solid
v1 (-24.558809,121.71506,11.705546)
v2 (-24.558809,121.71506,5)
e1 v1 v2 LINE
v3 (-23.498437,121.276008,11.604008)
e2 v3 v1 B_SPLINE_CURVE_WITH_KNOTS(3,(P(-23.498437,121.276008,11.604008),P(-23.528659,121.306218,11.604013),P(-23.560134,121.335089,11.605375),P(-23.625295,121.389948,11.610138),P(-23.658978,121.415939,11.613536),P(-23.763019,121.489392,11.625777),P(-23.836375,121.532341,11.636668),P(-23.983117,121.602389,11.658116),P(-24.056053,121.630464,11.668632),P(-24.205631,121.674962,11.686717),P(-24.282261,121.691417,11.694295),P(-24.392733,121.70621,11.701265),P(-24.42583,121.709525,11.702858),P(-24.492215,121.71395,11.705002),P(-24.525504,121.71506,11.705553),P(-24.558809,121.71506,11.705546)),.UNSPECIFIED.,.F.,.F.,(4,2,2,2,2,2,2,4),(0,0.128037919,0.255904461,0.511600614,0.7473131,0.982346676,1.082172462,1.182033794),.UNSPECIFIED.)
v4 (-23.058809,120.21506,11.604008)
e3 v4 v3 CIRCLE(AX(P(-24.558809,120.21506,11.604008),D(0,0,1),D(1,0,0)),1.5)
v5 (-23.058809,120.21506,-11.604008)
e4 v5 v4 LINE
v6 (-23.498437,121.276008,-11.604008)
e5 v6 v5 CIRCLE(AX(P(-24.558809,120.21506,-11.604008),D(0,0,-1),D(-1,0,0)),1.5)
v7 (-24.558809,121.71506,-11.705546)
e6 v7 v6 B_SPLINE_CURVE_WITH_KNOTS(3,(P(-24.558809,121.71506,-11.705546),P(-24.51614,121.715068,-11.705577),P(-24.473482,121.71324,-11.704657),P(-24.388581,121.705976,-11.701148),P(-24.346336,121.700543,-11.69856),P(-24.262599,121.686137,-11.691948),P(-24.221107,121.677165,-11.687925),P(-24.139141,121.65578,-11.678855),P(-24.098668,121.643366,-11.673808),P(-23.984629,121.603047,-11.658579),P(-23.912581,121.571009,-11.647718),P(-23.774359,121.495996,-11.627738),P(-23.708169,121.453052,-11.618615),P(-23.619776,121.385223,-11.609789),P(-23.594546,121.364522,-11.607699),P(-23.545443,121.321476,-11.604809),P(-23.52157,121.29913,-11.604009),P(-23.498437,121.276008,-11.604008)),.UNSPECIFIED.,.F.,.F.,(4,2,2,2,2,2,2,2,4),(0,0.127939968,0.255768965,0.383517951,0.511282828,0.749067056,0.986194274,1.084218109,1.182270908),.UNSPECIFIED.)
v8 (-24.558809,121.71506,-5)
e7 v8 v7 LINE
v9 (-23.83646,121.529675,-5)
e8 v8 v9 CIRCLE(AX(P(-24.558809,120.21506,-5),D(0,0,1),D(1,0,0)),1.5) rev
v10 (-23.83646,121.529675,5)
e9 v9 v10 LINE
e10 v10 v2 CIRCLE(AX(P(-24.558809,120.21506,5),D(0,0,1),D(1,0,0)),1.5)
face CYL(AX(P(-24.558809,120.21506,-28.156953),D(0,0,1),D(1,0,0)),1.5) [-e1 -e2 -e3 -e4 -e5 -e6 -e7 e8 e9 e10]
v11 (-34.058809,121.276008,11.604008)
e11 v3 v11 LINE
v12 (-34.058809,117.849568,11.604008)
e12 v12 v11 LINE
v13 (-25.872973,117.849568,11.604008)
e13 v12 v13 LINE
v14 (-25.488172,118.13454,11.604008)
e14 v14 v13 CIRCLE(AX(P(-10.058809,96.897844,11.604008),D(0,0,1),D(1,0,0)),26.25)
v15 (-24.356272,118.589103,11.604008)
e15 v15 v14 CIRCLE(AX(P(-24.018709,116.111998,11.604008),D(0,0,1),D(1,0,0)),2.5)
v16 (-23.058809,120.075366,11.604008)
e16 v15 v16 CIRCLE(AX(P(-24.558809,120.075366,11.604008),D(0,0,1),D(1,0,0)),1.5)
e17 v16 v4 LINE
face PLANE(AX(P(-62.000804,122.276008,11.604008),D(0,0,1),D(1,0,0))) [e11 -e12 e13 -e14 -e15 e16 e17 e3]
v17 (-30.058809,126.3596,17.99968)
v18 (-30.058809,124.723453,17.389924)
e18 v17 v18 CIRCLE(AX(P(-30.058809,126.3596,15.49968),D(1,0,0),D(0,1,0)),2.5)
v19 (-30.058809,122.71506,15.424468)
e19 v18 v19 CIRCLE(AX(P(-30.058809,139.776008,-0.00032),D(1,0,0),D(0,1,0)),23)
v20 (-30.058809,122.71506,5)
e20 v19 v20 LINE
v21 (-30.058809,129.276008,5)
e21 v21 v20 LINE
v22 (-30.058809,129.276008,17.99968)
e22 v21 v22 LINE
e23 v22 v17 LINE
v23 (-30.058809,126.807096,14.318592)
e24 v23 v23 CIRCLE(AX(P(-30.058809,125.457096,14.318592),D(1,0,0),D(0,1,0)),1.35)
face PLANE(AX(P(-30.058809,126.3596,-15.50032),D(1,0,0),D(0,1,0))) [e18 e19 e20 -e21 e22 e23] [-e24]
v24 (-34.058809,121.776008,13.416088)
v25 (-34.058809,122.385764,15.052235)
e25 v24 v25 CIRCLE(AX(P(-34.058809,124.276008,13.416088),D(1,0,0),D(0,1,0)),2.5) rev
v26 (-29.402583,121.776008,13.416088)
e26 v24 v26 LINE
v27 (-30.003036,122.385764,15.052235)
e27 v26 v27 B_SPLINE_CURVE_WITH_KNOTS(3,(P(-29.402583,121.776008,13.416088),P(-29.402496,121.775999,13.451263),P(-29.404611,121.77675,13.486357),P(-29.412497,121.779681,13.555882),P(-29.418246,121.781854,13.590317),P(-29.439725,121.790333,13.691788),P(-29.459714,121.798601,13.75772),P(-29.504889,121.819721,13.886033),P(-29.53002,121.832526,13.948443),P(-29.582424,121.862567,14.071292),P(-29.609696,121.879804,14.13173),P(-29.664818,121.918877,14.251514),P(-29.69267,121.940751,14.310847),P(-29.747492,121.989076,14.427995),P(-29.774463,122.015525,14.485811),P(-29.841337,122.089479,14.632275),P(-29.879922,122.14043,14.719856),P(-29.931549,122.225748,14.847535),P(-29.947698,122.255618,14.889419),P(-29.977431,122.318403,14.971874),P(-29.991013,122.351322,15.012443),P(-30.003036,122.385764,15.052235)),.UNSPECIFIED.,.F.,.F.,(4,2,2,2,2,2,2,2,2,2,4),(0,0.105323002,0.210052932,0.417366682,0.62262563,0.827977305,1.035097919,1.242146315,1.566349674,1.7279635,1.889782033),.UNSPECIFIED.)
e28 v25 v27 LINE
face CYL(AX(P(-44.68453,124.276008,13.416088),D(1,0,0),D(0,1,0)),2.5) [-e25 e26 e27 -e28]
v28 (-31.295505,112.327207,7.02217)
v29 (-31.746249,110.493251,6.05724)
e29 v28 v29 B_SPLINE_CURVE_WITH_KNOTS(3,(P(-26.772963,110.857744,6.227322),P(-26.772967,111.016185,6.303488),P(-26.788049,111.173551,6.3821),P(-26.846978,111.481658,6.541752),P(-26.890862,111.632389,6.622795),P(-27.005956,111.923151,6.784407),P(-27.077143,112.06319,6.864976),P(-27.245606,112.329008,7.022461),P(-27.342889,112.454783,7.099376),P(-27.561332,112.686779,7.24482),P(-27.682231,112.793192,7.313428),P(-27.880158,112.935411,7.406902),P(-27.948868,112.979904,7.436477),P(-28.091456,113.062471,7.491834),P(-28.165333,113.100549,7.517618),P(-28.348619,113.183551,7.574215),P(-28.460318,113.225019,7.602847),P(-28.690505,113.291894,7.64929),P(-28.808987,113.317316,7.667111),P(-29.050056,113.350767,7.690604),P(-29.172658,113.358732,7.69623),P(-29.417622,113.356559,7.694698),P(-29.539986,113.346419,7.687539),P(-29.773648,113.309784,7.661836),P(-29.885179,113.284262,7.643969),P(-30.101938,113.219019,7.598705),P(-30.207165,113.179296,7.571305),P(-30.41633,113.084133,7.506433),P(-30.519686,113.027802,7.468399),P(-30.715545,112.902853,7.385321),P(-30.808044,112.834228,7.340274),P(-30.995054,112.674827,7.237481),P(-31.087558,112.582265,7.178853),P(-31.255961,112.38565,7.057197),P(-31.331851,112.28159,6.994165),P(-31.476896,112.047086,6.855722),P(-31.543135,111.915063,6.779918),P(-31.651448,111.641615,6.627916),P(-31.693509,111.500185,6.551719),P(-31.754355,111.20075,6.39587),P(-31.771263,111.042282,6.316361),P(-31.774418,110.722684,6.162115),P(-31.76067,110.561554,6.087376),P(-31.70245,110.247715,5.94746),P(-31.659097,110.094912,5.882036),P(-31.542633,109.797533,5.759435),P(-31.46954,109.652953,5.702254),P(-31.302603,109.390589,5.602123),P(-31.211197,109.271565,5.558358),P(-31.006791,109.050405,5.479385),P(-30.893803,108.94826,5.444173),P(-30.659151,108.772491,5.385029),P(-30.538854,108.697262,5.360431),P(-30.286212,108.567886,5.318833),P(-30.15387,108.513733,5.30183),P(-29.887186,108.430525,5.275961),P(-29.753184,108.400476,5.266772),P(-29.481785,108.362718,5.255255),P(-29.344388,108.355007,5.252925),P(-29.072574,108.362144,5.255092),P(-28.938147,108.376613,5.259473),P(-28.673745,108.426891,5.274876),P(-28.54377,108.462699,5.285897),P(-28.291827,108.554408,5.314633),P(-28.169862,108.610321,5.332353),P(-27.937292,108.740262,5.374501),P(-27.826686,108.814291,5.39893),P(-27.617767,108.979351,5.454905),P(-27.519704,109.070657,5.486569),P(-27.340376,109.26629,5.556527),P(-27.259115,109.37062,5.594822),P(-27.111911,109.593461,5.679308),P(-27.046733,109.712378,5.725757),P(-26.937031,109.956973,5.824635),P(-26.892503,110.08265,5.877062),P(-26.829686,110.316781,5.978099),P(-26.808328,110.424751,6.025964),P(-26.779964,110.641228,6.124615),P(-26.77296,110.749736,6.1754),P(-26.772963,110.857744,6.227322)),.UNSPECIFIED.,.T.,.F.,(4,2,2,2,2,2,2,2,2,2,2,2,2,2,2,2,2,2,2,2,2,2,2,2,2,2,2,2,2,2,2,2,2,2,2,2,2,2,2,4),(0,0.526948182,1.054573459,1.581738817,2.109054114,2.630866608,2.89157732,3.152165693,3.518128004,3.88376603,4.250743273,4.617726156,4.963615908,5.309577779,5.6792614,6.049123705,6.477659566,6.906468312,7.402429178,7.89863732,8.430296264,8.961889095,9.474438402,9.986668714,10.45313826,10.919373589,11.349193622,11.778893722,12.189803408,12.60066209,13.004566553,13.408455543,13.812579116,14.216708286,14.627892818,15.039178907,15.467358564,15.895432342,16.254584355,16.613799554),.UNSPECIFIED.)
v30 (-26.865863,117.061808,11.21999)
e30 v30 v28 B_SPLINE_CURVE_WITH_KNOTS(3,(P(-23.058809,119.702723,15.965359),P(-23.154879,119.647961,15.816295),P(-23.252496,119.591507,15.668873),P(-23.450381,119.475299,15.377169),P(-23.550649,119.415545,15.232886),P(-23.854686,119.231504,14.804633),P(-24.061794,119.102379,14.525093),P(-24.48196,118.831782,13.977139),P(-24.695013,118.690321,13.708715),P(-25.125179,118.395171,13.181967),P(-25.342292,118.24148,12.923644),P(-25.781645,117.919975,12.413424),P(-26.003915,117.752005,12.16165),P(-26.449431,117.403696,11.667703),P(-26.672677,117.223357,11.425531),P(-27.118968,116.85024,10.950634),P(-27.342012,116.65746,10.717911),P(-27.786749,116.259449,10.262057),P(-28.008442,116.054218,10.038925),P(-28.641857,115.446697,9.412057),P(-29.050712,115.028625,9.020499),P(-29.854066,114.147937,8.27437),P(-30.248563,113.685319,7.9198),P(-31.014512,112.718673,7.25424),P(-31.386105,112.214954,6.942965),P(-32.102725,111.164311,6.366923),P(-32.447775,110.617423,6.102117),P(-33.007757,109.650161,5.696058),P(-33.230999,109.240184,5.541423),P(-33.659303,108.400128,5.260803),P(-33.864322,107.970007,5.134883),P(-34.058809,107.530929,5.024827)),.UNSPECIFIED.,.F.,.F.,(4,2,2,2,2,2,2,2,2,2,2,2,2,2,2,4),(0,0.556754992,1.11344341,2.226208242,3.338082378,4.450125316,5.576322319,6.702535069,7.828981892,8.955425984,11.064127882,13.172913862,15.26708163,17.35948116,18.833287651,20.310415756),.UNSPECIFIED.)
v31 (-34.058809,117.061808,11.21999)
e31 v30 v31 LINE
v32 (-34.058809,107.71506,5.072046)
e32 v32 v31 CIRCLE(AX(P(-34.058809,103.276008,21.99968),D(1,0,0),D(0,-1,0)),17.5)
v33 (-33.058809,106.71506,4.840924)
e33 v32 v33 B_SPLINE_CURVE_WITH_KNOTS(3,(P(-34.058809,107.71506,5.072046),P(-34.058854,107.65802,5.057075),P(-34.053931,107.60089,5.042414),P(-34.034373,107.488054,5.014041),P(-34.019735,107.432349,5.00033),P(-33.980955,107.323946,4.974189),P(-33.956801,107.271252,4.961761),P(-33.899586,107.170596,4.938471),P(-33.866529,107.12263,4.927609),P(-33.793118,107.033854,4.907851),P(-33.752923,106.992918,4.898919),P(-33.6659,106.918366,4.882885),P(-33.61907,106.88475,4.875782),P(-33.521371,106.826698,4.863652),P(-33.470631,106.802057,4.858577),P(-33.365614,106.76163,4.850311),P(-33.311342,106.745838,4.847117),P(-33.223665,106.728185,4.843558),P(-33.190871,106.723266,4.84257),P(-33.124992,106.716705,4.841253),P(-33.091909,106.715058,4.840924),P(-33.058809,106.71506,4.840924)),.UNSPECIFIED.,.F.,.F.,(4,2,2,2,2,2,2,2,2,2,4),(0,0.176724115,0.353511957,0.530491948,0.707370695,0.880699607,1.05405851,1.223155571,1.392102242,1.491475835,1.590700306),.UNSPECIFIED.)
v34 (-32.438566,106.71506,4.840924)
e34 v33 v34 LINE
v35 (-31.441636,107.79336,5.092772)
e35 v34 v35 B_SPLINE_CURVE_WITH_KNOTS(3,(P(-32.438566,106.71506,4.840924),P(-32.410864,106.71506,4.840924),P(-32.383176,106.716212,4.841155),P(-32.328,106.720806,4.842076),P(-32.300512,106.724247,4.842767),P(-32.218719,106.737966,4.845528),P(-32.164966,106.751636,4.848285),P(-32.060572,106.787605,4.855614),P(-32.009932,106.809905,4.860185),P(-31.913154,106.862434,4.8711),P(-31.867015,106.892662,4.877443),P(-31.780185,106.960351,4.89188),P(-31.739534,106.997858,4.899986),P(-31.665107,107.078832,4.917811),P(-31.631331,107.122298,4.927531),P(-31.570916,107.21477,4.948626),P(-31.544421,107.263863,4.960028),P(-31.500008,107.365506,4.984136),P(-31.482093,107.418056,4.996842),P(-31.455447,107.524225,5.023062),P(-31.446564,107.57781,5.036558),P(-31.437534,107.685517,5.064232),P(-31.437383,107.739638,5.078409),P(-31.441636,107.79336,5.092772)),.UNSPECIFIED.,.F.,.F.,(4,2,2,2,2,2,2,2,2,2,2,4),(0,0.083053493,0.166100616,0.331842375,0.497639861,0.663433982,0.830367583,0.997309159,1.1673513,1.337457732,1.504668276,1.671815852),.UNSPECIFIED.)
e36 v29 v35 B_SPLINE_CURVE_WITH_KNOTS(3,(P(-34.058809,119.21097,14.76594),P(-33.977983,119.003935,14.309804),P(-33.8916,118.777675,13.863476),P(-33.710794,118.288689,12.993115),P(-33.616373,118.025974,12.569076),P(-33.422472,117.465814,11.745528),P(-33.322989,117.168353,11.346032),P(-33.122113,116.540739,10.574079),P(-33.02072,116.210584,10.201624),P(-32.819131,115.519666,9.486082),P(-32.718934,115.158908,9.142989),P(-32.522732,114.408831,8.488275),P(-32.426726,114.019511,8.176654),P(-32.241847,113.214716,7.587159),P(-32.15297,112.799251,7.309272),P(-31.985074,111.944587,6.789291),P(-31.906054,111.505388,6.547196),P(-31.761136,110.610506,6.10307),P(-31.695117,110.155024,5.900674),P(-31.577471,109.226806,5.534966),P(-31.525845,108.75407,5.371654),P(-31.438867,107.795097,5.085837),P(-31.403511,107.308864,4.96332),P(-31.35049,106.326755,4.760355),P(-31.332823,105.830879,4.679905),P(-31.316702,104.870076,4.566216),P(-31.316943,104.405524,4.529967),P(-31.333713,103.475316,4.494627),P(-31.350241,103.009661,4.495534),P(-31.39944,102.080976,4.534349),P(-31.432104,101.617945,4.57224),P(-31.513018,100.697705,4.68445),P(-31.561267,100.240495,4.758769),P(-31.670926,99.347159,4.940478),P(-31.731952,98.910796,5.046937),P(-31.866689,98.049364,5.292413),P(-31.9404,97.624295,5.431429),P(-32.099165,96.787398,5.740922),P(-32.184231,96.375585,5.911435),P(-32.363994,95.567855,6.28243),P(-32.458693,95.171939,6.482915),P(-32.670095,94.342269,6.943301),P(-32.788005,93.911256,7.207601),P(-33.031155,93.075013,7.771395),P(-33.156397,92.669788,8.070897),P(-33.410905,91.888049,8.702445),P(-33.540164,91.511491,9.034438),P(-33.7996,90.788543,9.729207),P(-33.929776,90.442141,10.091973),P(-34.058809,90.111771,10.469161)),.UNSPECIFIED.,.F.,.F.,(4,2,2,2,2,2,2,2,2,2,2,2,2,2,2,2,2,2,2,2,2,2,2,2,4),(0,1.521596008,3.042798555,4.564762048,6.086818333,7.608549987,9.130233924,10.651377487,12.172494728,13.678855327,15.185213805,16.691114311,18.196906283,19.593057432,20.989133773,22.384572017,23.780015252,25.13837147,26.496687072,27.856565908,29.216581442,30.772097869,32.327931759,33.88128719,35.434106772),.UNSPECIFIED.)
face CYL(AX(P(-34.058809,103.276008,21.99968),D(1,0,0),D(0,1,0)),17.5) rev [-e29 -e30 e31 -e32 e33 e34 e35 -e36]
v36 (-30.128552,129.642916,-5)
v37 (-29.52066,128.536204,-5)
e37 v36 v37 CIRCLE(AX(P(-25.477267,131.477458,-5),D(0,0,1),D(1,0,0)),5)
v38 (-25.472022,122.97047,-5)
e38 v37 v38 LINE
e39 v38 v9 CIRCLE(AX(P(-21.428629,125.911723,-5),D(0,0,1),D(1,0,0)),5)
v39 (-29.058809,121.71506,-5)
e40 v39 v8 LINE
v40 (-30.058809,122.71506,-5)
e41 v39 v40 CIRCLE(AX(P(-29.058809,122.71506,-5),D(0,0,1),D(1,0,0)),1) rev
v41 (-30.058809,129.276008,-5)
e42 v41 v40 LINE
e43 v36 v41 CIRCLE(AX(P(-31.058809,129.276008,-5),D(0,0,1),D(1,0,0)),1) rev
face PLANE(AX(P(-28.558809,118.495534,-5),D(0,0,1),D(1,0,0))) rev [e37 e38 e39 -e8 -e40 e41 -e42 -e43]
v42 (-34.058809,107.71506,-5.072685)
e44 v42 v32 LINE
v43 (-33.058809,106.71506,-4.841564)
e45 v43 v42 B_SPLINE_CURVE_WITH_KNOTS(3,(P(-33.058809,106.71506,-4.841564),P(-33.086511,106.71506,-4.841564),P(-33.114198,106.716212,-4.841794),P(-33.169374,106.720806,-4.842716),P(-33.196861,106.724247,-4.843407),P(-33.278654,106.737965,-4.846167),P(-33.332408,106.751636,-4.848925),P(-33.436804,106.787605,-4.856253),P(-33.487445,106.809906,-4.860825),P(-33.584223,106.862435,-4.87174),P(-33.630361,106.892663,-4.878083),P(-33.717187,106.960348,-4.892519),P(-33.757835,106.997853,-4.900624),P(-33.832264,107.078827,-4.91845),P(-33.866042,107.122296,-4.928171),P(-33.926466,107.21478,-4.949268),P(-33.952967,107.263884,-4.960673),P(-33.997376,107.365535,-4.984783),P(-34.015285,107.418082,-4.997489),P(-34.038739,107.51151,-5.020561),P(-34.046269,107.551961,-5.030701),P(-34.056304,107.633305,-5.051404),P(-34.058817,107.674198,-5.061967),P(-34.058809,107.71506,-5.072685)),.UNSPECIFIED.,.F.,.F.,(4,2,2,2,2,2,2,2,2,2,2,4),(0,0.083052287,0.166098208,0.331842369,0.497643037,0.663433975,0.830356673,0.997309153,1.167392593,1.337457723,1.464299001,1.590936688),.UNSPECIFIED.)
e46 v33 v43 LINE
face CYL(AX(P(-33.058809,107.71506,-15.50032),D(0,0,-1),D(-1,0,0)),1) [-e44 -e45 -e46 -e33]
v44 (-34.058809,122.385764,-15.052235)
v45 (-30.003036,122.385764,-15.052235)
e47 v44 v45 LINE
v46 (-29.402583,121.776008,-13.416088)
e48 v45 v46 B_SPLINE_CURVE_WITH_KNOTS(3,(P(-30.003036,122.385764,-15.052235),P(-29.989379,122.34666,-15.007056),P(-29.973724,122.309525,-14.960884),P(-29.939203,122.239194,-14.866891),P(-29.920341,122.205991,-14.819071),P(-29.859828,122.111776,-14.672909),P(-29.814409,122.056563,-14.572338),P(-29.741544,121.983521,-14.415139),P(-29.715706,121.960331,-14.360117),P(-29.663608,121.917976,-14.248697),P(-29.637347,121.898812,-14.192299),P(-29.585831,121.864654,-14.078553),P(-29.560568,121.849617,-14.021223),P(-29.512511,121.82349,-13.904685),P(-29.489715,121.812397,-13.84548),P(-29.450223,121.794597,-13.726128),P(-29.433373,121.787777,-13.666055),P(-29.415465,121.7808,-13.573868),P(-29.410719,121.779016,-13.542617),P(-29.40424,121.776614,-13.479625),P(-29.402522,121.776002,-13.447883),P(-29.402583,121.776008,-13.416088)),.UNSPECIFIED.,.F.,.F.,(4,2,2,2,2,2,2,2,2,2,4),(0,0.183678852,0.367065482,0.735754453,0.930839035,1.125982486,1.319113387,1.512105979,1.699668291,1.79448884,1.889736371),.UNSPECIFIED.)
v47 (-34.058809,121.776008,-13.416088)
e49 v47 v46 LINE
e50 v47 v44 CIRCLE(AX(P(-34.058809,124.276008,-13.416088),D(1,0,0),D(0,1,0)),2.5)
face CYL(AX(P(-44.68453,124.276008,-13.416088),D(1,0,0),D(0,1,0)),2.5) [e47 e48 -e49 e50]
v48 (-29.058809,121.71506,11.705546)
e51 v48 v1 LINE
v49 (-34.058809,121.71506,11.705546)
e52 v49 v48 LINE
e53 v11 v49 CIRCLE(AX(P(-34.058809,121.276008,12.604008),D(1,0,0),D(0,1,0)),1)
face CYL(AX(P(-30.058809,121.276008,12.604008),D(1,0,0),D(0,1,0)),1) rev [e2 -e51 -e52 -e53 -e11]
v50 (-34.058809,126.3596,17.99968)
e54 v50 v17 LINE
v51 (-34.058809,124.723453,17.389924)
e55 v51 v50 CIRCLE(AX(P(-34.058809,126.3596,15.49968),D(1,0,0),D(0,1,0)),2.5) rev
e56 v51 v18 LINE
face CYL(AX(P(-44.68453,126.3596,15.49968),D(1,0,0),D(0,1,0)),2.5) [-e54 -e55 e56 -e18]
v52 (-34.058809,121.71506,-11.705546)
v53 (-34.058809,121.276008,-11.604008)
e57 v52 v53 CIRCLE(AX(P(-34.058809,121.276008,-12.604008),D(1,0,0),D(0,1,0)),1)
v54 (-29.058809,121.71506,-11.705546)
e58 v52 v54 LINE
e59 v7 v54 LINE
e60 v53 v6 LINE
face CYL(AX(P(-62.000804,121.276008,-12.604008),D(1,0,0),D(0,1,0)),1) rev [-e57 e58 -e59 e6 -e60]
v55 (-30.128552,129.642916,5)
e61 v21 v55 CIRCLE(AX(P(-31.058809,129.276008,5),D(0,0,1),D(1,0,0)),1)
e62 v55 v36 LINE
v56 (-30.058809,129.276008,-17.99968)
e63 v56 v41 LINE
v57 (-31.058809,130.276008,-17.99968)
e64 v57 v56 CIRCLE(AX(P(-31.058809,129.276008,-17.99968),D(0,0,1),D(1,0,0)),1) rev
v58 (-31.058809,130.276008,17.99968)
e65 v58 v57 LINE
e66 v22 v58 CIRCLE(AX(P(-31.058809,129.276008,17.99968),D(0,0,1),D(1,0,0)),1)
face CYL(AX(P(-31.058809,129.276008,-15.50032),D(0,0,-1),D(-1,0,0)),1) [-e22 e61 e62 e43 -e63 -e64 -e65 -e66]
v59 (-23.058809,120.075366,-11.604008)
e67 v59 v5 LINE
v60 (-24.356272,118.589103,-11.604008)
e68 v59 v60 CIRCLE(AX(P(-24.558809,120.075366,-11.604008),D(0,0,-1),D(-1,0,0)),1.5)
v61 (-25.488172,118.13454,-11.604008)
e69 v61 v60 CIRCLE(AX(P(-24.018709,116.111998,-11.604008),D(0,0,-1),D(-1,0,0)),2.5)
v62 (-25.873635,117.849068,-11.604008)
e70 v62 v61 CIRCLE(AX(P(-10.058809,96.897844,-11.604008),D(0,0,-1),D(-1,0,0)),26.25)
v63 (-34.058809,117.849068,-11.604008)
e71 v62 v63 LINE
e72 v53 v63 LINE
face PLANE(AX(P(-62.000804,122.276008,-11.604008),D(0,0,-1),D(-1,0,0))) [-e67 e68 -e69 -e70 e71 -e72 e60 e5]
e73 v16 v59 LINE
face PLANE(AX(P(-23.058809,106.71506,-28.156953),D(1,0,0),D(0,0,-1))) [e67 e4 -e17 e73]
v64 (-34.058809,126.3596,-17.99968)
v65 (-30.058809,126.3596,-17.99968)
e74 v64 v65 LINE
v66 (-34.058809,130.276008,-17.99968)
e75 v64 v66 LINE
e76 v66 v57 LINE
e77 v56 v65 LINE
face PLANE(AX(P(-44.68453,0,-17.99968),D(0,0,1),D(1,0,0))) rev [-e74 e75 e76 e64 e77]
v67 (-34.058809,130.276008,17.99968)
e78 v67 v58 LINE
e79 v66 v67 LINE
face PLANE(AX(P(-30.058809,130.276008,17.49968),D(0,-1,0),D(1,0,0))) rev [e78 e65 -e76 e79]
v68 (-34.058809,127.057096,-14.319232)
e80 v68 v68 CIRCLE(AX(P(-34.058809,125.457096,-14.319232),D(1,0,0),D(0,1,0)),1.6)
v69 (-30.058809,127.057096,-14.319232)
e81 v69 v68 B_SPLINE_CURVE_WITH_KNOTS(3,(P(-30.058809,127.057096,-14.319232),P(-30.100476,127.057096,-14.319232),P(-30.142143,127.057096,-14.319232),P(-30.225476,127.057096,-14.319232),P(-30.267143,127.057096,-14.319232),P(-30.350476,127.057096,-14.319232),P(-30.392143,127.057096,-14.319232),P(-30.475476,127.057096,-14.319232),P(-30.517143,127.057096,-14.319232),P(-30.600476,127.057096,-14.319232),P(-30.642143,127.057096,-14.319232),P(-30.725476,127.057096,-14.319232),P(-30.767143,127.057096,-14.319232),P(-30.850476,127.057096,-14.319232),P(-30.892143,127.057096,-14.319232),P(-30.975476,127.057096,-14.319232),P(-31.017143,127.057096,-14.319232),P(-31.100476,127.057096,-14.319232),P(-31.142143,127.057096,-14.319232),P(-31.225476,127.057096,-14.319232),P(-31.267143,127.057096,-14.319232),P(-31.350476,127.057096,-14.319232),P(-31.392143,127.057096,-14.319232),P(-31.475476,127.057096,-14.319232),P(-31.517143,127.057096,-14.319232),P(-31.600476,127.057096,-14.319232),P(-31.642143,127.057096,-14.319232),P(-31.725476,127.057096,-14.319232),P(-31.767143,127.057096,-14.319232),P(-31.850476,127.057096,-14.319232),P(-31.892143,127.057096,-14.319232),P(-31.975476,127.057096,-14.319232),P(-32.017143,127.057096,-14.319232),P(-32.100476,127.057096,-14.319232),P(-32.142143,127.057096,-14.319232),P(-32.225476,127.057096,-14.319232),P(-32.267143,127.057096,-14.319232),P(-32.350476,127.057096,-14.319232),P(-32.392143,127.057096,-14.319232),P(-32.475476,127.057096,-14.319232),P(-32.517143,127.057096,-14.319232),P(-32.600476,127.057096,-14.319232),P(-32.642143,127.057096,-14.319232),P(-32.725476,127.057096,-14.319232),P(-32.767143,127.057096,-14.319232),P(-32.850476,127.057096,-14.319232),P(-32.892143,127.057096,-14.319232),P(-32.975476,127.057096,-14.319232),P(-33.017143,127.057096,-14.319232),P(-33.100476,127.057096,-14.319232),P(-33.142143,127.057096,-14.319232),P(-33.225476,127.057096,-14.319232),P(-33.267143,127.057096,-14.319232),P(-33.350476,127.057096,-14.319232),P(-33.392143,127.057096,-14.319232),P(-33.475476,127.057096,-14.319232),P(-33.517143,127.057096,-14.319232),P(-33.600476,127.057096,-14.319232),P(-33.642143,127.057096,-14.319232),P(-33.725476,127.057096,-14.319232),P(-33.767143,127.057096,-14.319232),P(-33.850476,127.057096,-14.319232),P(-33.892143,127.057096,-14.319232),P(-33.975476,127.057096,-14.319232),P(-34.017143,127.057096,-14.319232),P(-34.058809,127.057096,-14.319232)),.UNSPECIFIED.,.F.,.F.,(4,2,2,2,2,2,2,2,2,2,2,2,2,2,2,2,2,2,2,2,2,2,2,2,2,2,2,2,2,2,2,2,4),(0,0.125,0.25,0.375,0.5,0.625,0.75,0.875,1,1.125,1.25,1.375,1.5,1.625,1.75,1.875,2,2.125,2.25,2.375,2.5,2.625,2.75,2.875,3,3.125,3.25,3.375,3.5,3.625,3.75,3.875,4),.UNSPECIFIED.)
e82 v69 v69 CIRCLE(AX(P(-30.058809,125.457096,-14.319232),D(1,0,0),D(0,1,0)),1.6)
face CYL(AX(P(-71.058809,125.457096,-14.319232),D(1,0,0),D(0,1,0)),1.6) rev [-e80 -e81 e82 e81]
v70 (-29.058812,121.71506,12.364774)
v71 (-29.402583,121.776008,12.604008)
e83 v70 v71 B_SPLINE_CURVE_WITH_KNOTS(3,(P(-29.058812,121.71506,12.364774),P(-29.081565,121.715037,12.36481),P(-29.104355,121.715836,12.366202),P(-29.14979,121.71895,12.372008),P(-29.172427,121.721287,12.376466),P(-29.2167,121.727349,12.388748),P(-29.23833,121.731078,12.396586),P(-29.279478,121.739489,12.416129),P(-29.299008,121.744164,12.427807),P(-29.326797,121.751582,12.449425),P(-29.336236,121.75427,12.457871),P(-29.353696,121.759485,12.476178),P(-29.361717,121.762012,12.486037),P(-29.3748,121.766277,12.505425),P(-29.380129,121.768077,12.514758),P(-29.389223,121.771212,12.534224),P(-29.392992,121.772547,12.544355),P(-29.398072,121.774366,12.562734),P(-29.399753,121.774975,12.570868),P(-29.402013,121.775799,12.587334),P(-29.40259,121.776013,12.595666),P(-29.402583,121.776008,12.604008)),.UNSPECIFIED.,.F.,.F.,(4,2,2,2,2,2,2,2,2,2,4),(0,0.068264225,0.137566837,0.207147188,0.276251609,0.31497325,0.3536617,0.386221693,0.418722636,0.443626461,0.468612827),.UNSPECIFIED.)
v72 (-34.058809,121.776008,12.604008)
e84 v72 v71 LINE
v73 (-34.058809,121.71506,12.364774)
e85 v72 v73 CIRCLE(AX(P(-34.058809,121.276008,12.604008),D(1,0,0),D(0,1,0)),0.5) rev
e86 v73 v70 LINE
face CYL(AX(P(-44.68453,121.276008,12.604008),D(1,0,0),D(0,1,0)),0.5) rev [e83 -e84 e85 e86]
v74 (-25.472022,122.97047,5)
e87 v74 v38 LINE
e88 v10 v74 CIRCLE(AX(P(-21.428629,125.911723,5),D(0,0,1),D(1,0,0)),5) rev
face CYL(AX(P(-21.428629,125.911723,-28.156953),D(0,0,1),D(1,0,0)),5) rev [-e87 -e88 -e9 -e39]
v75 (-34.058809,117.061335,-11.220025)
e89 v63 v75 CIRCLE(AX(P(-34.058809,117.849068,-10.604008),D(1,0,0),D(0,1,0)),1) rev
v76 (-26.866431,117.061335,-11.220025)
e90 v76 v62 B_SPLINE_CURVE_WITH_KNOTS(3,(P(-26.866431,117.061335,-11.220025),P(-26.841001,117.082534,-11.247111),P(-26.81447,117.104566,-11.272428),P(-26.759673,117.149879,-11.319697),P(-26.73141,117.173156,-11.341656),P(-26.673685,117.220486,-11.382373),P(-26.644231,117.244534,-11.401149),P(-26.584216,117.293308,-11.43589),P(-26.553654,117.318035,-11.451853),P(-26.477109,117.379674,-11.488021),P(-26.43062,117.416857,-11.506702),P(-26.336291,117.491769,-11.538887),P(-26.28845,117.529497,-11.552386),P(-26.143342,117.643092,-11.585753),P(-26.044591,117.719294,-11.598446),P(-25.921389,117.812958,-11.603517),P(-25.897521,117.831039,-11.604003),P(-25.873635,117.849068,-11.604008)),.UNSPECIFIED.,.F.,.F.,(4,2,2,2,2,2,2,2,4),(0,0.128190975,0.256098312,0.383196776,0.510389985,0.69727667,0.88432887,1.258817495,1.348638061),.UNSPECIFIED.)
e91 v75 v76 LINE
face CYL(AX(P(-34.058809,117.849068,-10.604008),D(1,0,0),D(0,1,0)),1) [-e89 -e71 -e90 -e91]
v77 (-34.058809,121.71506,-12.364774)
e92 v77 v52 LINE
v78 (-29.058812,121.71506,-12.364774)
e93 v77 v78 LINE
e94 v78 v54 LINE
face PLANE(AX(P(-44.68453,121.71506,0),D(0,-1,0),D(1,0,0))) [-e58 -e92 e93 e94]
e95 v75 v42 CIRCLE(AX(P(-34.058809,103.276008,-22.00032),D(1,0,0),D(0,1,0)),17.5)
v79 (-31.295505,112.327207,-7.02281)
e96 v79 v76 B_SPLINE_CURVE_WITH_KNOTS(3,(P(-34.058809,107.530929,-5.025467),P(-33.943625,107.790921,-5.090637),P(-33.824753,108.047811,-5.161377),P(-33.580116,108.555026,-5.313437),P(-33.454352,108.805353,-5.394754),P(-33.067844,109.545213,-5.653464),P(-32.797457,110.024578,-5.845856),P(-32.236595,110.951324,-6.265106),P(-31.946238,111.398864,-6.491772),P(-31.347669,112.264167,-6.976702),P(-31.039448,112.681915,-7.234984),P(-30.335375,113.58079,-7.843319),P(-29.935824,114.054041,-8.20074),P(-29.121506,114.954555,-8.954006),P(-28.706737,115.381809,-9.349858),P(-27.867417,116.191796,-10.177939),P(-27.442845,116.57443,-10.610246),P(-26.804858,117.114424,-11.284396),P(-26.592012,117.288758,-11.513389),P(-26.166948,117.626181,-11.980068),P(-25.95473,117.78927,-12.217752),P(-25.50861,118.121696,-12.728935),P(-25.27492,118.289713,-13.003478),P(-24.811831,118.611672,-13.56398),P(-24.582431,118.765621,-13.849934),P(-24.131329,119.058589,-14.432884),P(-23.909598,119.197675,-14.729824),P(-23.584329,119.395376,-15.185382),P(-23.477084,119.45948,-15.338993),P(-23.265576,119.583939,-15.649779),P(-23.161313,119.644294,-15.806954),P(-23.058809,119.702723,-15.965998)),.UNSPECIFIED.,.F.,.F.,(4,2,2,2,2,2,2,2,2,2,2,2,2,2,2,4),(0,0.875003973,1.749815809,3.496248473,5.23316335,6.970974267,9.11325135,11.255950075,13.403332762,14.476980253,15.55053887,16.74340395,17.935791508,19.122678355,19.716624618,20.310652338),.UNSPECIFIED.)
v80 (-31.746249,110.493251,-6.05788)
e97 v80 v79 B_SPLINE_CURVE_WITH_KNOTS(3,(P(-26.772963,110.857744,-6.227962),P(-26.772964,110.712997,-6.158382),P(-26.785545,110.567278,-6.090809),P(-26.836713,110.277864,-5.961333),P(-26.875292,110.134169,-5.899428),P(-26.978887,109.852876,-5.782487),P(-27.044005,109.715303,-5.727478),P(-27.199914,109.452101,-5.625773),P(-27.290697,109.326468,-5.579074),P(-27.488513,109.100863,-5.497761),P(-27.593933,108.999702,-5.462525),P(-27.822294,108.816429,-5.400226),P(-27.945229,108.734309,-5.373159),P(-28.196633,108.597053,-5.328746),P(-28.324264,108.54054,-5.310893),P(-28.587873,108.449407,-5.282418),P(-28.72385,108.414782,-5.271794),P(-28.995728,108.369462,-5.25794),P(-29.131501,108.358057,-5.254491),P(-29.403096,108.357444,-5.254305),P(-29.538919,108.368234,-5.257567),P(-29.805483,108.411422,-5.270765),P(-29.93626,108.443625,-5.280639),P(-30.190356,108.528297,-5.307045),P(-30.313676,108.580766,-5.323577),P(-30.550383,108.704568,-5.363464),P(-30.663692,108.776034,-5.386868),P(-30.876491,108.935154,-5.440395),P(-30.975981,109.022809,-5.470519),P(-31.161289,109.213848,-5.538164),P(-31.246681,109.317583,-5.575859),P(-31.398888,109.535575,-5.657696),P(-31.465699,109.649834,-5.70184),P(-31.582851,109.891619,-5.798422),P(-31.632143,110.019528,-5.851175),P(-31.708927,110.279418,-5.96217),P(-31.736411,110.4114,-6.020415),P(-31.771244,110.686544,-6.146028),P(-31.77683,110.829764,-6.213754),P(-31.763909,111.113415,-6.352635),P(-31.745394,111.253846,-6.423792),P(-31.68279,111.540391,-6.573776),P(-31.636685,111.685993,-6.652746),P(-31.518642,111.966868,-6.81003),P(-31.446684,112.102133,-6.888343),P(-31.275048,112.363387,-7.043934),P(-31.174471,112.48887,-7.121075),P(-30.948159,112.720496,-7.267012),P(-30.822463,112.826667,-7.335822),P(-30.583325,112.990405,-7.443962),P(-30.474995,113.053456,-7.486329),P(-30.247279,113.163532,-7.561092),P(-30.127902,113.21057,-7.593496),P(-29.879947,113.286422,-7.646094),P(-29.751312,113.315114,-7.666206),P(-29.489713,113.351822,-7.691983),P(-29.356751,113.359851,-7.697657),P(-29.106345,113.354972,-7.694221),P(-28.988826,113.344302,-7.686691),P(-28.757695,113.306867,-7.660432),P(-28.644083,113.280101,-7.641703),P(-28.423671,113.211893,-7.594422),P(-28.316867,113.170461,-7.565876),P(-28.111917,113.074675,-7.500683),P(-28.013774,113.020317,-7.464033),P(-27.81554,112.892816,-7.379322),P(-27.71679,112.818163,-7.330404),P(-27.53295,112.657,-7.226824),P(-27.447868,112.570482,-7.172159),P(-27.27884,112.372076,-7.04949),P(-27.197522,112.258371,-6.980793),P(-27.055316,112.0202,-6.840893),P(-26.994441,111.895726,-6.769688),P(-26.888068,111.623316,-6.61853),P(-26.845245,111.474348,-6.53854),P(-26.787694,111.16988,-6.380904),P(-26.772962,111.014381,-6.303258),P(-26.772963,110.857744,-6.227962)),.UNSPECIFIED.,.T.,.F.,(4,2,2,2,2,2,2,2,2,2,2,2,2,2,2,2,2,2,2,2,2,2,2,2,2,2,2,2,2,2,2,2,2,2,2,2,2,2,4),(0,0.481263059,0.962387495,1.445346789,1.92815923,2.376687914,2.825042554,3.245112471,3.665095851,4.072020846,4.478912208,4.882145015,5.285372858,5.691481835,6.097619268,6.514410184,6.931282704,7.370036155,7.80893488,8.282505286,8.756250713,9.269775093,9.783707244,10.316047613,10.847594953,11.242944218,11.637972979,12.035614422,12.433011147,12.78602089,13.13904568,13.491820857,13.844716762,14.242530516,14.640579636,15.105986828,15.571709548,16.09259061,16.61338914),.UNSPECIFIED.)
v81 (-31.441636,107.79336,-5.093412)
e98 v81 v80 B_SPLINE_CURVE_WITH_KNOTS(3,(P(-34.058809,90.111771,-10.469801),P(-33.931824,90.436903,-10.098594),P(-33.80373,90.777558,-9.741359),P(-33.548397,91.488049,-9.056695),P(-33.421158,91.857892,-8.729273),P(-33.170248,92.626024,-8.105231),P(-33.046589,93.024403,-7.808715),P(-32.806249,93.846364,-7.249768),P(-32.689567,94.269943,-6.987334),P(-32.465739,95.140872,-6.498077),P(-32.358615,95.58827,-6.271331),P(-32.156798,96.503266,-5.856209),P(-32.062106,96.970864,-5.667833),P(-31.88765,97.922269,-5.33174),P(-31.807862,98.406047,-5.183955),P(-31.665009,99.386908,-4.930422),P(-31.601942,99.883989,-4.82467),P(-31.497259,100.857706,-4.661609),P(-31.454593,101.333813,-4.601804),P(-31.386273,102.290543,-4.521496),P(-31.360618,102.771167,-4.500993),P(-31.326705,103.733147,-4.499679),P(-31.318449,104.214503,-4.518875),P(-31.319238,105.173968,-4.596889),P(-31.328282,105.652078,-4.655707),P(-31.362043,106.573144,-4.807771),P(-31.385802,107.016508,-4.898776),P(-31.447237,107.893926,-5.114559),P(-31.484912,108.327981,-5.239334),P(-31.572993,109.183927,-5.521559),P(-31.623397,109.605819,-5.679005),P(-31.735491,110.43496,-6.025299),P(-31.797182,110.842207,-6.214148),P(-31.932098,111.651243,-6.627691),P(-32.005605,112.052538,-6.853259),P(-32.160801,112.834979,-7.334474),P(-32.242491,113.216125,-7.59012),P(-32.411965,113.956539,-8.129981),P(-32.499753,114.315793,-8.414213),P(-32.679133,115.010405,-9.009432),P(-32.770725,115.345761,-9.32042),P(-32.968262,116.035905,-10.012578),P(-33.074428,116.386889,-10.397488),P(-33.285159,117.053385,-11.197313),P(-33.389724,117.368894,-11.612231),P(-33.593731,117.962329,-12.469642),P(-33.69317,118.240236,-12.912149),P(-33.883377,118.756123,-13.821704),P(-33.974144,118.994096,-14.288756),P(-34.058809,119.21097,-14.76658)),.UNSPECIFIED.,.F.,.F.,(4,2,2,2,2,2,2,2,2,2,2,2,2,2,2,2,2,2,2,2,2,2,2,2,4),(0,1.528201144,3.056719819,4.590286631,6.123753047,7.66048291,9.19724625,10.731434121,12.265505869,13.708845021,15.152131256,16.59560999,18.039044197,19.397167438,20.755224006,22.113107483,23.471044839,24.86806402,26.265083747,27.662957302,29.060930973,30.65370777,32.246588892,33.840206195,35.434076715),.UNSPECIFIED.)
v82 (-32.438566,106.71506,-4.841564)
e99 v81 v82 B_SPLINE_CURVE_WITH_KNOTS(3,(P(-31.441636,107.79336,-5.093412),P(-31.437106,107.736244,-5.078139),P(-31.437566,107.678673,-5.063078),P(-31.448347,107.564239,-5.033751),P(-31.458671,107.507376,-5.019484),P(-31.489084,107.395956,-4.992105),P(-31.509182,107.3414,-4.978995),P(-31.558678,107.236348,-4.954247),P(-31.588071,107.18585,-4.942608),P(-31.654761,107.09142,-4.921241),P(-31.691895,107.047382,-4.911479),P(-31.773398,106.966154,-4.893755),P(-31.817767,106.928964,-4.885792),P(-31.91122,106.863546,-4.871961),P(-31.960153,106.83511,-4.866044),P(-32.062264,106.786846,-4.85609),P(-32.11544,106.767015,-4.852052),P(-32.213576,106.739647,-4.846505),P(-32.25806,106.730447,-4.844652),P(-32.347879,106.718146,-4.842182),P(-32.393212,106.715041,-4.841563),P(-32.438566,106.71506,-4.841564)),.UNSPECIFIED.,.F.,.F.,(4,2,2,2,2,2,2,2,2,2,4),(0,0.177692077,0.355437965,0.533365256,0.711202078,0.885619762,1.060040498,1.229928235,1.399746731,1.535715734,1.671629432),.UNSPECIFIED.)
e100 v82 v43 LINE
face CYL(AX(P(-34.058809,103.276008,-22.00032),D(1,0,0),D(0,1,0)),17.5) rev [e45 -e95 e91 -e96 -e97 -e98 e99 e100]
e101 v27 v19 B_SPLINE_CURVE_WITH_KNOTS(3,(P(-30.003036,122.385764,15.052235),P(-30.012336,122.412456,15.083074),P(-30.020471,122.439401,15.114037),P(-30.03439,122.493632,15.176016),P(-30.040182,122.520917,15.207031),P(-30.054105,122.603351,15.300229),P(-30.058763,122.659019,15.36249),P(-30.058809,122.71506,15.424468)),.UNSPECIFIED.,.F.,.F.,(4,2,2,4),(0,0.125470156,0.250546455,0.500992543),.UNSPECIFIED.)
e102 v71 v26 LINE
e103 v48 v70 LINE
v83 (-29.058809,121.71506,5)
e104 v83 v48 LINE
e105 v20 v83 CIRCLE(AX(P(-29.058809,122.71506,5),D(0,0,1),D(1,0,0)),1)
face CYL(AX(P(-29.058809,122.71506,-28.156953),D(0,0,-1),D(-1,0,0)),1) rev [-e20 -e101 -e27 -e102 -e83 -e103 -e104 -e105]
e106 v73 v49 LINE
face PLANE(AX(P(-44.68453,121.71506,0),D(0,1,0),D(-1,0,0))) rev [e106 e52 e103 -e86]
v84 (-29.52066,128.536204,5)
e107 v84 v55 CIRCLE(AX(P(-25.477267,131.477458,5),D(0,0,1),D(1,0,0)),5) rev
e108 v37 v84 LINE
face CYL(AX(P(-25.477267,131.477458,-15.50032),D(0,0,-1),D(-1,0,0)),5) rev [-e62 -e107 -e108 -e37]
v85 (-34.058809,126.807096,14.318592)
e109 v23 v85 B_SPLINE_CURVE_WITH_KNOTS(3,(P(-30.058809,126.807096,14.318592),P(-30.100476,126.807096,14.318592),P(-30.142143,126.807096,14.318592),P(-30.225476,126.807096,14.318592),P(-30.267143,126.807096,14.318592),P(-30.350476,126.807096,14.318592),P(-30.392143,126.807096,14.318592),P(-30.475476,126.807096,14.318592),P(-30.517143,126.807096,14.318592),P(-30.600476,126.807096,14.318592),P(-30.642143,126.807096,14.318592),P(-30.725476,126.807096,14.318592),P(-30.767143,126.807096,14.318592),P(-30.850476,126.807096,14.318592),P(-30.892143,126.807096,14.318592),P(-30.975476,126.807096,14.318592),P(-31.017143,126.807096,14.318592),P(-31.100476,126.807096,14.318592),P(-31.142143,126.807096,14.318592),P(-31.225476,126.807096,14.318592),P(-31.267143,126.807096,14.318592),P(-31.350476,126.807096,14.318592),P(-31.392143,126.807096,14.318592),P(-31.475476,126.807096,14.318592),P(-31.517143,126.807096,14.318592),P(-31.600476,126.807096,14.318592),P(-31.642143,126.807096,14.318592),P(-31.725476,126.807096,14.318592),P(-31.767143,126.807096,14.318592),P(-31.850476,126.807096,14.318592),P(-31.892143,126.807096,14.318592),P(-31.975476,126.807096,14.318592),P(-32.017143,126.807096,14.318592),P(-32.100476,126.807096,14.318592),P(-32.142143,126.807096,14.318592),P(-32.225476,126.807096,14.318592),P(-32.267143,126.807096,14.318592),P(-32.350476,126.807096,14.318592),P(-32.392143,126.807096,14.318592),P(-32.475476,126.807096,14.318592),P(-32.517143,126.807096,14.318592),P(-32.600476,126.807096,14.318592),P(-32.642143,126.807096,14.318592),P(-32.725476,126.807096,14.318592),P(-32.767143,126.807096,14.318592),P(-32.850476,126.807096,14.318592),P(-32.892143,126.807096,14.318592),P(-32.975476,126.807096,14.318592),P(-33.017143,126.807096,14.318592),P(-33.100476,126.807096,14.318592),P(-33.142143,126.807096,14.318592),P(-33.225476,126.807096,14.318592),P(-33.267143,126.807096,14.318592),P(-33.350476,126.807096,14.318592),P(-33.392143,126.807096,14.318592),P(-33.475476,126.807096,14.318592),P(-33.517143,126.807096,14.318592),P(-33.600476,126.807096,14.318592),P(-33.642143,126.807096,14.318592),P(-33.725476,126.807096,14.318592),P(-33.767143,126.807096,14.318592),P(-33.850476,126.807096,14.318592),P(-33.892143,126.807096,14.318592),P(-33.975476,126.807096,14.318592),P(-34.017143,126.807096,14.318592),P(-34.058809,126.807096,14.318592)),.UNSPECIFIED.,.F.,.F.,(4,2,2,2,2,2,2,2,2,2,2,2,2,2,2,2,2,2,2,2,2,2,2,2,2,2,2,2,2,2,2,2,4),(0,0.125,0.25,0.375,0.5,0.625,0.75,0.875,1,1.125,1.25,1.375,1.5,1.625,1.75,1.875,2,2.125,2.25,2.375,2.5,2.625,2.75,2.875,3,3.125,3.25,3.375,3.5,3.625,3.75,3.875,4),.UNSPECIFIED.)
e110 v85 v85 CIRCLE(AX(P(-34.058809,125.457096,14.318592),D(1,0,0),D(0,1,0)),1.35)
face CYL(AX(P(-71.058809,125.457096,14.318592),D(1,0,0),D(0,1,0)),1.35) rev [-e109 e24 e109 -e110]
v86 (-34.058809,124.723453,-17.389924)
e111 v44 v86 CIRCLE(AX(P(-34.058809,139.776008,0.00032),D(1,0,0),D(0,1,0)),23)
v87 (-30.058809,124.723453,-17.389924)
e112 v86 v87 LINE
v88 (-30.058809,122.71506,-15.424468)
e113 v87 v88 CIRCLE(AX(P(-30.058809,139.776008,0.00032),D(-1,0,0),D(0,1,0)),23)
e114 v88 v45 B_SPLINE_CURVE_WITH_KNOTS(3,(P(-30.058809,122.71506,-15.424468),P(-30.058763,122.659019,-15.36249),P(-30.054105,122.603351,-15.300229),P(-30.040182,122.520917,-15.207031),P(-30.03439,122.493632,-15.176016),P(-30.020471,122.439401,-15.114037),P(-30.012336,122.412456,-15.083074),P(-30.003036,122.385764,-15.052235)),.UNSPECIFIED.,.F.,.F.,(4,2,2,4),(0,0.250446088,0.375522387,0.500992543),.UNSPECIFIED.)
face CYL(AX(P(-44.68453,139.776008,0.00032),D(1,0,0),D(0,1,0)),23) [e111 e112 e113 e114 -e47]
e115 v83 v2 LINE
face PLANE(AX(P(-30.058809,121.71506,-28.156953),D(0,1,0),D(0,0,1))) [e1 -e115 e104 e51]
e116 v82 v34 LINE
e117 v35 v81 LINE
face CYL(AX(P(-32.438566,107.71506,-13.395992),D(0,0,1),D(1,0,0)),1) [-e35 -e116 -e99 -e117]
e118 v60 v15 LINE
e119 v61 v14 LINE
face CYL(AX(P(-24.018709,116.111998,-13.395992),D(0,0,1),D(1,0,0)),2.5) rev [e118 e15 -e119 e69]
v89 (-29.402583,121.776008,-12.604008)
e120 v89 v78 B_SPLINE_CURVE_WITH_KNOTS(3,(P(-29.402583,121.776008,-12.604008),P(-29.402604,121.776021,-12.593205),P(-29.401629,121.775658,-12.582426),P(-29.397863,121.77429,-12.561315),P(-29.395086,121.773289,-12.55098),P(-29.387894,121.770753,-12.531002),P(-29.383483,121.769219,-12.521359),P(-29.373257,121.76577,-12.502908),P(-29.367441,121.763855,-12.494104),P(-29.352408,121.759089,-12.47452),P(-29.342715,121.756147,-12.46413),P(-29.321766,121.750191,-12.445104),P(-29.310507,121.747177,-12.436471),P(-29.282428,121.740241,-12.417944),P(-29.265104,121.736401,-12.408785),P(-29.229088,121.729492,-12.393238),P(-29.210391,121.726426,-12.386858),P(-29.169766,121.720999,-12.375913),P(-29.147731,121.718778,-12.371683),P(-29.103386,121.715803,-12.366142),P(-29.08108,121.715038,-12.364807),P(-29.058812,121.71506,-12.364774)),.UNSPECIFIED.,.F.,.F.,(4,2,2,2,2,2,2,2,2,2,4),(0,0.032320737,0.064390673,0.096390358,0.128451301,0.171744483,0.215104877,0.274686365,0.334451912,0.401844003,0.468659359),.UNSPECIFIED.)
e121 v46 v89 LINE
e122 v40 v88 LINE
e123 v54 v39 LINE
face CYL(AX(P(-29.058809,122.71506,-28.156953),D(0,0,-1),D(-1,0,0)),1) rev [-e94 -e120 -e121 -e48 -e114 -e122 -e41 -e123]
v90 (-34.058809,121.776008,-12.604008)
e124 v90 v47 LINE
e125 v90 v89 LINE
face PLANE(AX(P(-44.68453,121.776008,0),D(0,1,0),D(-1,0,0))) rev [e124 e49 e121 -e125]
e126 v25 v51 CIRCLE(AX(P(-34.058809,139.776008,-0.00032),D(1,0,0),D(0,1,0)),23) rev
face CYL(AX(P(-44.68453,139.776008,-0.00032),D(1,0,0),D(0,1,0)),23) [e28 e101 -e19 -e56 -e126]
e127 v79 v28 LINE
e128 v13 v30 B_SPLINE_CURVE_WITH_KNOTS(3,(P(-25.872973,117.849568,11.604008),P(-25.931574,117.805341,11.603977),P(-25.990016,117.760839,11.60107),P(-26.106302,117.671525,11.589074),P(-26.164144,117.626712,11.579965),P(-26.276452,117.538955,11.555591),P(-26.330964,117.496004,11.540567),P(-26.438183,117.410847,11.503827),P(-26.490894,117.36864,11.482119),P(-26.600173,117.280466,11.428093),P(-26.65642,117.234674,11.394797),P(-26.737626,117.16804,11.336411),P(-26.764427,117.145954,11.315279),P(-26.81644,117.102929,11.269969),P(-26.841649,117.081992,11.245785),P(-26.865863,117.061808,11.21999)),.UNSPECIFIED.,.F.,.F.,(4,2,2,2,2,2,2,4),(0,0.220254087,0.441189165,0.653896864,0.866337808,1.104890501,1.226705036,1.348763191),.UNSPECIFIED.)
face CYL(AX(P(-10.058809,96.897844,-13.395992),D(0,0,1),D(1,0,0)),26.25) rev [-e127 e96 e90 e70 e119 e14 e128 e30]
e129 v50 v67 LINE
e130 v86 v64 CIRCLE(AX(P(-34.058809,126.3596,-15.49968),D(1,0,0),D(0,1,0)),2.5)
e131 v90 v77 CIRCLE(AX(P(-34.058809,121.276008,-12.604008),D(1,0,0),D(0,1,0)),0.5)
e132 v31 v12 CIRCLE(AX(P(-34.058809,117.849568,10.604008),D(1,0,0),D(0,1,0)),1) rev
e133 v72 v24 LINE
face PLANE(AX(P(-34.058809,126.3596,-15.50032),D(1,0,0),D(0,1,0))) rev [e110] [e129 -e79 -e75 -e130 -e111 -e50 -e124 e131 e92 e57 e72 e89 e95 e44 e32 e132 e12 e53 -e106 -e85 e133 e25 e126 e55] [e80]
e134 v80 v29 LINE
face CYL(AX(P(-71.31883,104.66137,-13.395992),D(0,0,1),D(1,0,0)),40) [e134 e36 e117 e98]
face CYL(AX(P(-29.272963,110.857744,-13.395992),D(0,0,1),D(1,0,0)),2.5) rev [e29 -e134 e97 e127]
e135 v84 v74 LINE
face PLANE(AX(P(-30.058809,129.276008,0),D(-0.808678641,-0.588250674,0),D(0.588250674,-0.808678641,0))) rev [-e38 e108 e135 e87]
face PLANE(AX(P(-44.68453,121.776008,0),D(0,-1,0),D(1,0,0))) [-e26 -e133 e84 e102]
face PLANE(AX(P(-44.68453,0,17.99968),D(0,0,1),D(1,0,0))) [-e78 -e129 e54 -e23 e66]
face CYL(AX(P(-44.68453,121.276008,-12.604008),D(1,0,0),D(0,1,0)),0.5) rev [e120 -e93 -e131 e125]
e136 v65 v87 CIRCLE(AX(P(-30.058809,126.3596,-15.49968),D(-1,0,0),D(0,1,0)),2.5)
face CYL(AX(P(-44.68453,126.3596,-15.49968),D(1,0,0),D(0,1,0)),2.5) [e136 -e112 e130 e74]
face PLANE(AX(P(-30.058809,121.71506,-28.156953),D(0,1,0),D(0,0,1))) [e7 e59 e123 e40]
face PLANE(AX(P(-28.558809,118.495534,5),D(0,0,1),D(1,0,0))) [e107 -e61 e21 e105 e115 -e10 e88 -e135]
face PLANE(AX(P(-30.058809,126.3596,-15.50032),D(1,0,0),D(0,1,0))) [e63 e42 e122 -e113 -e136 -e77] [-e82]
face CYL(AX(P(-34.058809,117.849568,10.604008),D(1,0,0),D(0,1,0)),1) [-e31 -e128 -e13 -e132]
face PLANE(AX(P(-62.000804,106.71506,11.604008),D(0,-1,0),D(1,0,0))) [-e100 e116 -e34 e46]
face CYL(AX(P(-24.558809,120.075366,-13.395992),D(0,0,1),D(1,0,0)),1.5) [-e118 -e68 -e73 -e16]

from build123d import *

# Parameters (mm, degrees)
EXTRUDE_1_DEPTH          = 4
EXTRUDE_START            = -4
SKETCH_3_W               = 23.208015554
SKETCH_3_H               = 15.560947598
EXTRUDE_2_DEPTH          = 4
SKETCH_7_W               = 7
SKETCH_7_H               = 15
EXTRUDE_3_DEPTH          = 23.208015554
CUT_EXTRUDE_6_DEPTH      = 25
SKETCH_5_R               = 1.35
SKETCH_5_R_2             = 1.6
CUT_EXTRUDE_2_DEPTH      = 41
FILLET_1_R               = 1
CUT_EXTRUDE_9_DEPTH      = 132.632440775
CUT_EXTRUDE_9_DEPTH_BACK = 132.632440775
SKETCH_16_R              = 17.5
EXTRUDE_5_DEPTH          = 4
FILLET_8_R               = 1
FILLET_10_R              = 1
FILLET_12_R              = 1
FILLET_13_R              = 1.5
RIB_1_REACH              = 137.852
SKETCH_19_WALL_W         = 283.05422189
SKETCH_19_WALL_H         = 10
FILLET_START             = -15.424467696
FILLET_14_DEPTH          = 30.848935392
FILLET_START_2           = -12.604007877
FILLET_14_2_DEPTH        = 25.208015654
FILLET_START_3           = -30.058809371
FILLET_14_3_DEPTH        = 2.058809371
FILLET_15_R              = 5


with BuildPart() as part:
    # 草图2 → 凸台-拉伸1 (new body)
    with BuildSketch(Plane(origin=(-34.058809371, 0, 0), x_dir=(0, 0, -1), z_dir=(1, 0, 0))):
        with BuildLine():
            Line((17.500319827, 130.276008038), (17.500319827, 126.359600173))
            ThreePointArc((17.500319827, 126.359600173), (17.374404969, 125.661169877), (17.012514948, 125.050682332))
            ThreePointArc((17.012514948, 125.050682332), (15.910222403, 123.866105461), (14.725645532, 122.763812916))
            ThreePointArc((14.725645532, 122.763812916), (14.115157987, 122.401922895), (13.416727692, 122.276008038))
            Line((13.416727692, 122.276008038), (8.570604361, 122.276008038))
            Line((8.570604361, 122.276008038), (-4.829395639, 122.276008038))
            Line((-4.829395639, 122.276008038), (-13.416088038, 122.276008038))
            ThreePointArc((-13.416088038, 122.276008038), (-14.114518334, 122.401922895), (-14.725005879, 122.763812916))
            ThreePointArc((-14.725005879, 122.763812916), (-15.90958275, 123.866105461), (-17.011875295, 125.050682332))
            ThreePointArc((-17.011875295, 125.050682332), (-17.373765316, 125.661169877), (-17.499680173, 126.359600173))
            Line((-17.499680173, 126.359600173), (-17.499680173, 130.276008038))
            Line((-17.499680173, 130.276008038), (17.500319827, 130.276008038))
        make_face()
    extrude(amount=EXTRUDE_1_DEPTH)

    # 草图3 → 凸台-拉伸2 (add)
    with BuildSketch(Plane(origin=(-30.058809371, 0, 0), x_dir=(0, 0, -1), z_dir=(1, 0, 0)).offset(EXTRUDE_START)):
        with Locations((0, 114.495534239)):
            Rectangle(SKETCH_3_W, SKETCH_3_H)
    extrude(amount=EXTRUDE_2_DEPTH)

    # 草图7 → 凸台-拉伸3 (add)
    with BuildSketch(Plane.XY.offset(11.604007777)):
        with Locations((-26.558809371, 114.21506044)):
            Rectangle(SKETCH_7_W, SKETCH_7_H)
    extrude(amount=-EXTRUDE_3_DEPTH)

    # 草图11 → 切除-拉伸6 (cut)
    with BuildSketch(Plane.XY.offset(11.604007777)):
        with BuildLine():
            Line((-17.260737948, 105.57071884), (-17.822335609, 118.157865003))
            ThreePointArc((-17.822335609, 118.157865003), (-20.746096987, 118.264862867), (-23.654216554, 118.585284033))
            ThreePointArc((-23.654216554, 118.585284033), (-24.615393694, 118.539747196), (-25.488172243, 118.134540208))
            ThreePointArc((-25.488172243, 118.134540208), (-28.620362377, 115.459397112), (-31.295505473, 112.327206978))
            ThreePointArc((-31.295505473, 112.327206978), (-31.700712461, 111.454428429), (-31.746249298, 110.493251289))
            ThreePointArc((-31.746249298, 110.493251289), (-31.523200675, 108.69967015), (-31.381401894, 106.897844106))
            ThreePointArc((-31.381401894, 106.897844106), (-31.32637065, 105.4380129), (-31.324682737, 103.977145782))
            Line((-31.324682737, 103.977145782), (-17.260737948, 105.57071884))
        make_face()
    extrude(amount=-CUT_EXTRUDE_6_DEPTH, mode=Mode.SUBTRACT)

    # 草图5 → 切除-拉伸2 (cut)
    with BuildSketch(Plane(origin=(-30.058809371, 0, 0), x_dir=(0, 0, -1), z_dir=(1, 0, 0))):
        with Locations(Location((-14.318592493, 125.457095719, 0), (0, 0, 90))):
            Circle(SKETCH_5_R)
        with Locations(Location((14.319232146, 125.457095719, 0), (0, 0, 90))):
            Circle(SKETCH_5_R_2)
    extrude(amount=-CUT_EXTRUDE_2_DEPTH, mode=Mode.SUBTRACT)

    # 圆角1
    fillet_1_edges = [part.edges().sort_by_distance(p)[0] for p in [
        (-32.058809371, 122.276008038, -11.604007777),
    ]]
    fillet(fillet_1_edges, radius=FILLET_1_R)
    fillet_1_2_edges = [part.edges().sort_by_distance(p)[0] for p in [
        (-32.058809371, 122.276008038, 11.604007777),
    ]]
    fillet(fillet_1_2_edges, radius=FILLET_1_R)

    # 草图16 → 切除-拉伸9 (cut, two sides: drawn at the far end of the back side and taken through both)
    with BuildSketch(Plane(origin=(-30.058809371, 0, 0), x_dir=(0, 0, -1), z_dir=(1, 0, 0)).offset(-CUT_EXTRUDE_9_DEPTH_BACK)):
        with Locations((22.000319827, 103.276008038)):
            Circle(SKETCH_16_R)
        with Locations((-21.999680173, 103.276008038)):
            Circle(SKETCH_16_R)
    extrude(amount=CUT_EXTRUDE_9_DEPTH + CUT_EXTRUDE_9_DEPTH_BACK, mode=Mode.SUBTRACT)

    # 草图17 → 凸台-拉伸5 (add)
    with BuildSketch(Plane(origin=(-30.058809371, 0, 0), x_dir=(0, 0, -1), z_dir=(1, 0, 0)).offset(EXTRUDE_START)):
        with BuildLine():
            Line((-12.604007777, 122.276008038), (-13.416088038, 122.276008038))
            ThreePointArc((-13.416088038, 122.276008038), (-14.114518334, 122.401922895), (-14.725005879, 122.763812916))
            ThreePointArc((-14.725005879, 122.763812916), (-15.90958275, 123.866105461), (-17.011875295, 125.050682332))
            ThreePointArc((-17.011875295, 125.050682332), (-17.373765316, 125.661169877), (-17.499680173, 126.359600173))
            Line((-17.499680173, 126.359600173), (-17.499680173, 130.276008038))
            Line((-17.499680173, 130.276008038), (-17.999680173, 130.276008038))
            Line((-17.999680173, 130.276008038), (-17.999680173, 129.776008038))
            Line((-17.999680173, 129.776008038), (-17.999680173, 126.359600173))
            ThreePointArc((-17.999680173, 126.359600173), (-17.842286602, 125.486562303), (-17.389924076, 124.723452872))
            ThreePointArc((-17.389924076, 124.723452872), (-16.263136141, 123.512552071), (-15.052235339, 122.385764135))
            ThreePointArc((-15.052235339, 122.385764135), (-14.289125908, 121.93340161), (-13.416088038, 121.776008038))
            Line((-13.416088038, 121.776008038), (-12.604007777, 121.776008038))
            ThreePointArc((-12.604007777, 121.776008038), (-12.48056994, 121.760531619), (-12.364773606, 121.71506044))
            Line((-12.364773606, 121.71506044), (-11.705546321, 121.71506044))
            ThreePointArc((-11.705546321, 121.71506044), (-12.074410006, 122.124256941), (-12.604007777, 122.276008038))
        make_face()
    extrude_5 = extrude(amount=EXTRUDE_5_DEPTH)

    # 镜向1: 凸台-拉伸5 across plane
    add(extrude_5.mirror(Plane.XY))

    # 圆角8
    fillet_8_edges = [part.edges().sort_by_distance(p)[0] for p in [
        (-30.284407251, 117.353177347, -11.604007777),
        (-30.284113568, 117.353649723, 11.604007777),
    ]]
    fillet(fillet_8_edges, radius=FILLET_8_R)

    # 圆角10
    fillet_10_edges = [part.edges().sort_by_distance(p)[0] for p in [
        (-30.058809371, 130.276008038, 0),
    ]]
    fillet(fillet_10_edges, radius=FILLET_10_R)

    # 圆角12
    fillet_12_edges = [part.edges().sort_by_distance(p)[0] for p in [
        (-31.371585595, 106.71506044, -0.000319827),
        (-34.058809371, 106.71506044, -0.000319827),
    ]]
    fillet(fillet_12_edges, radius=FILLET_12_R)

    # 圆角13
    fillet_13_edges = [part.edges().sort_by_distance(p)[0] for p in [
        (-23.058809371, 121.71506044, 0),
        (-23.058809371, 118.502104481, 0),
    ]]
    fillet(fillet_13_edges, radius=FILLET_13_R)

    # 草图19 wall → 筋1 (add, up to next)
    with BuildSketch(Plane(origin=(-27.308809371, 125.495534239, 0), x_dir=(0.588250674462, -0.808678640744, 0), z_dir=(0.808678640744, 0.588250674462, 0)), mode=Mode.PRIVATE) as rib_1_sk1:
        Rectangle(SKETCH_19_WALL_W, SKETCH_19_WALL_H)
    rib_1_tool1 = extrude(rib_1_sk1.sketch, amount=-RIB_1_REACH, mode=Mode.PRIVATE) - part.part
    add(rib_1_tool1.solids().sort_by_distance((-27.308809371, 125.495534239, 0))[0])

    # 圆角14: read off the stored shape, not the designer's step
    # 圆角14 outline → 圆角14 (add)
    with BuildSketch(Plane.XY.offset(FILLET_START)):
        with BuildLine():
            Line((-30.058809371, 121.776008038), (-29.402583406, 121.776008038))
            ThreePointArc((-29.402583406, 121.776008038), (-29.878496517, 122.142248968), (-30.058809371, 122.71506044))
            Line((-30.058809371, 122.71506044), (-30.058809371, 121.776008038))
        make_face()
    extrude(amount=FILLET_14_DEPTH)

    # Fillet 14 2 outline → Fillet 14 2 (add)
    with BuildSketch(Plane.XY.offset(FILLET_START_2)):
        with BuildLine():
            Line((-30.058809371, 121.71506044), (-29.058809371, 121.71506044))
            ThreePointArc((-29.058809371, 121.71506044), (-29.233376834, 121.730415224), (-29.402583406, 121.776008038))
            Line((-29.402583406, 121.776008038), (-30.058809371, 121.776008038))
            Line((-30.058809371, 121.776008038), (-30.058809371, 121.71506044))
        make_face()
    extrude(amount=FILLET_14_2_DEPTH)

    # Fillet 14 3 outline → Fillet 14 3 (cut)
    with BuildSketch(Plane.YZ.offset(FILLET_START_3)):
        with BuildLine():
            ThreePointArc((121.71506044, 12.364773606), (121.760531619, 12.48056994), (121.776008038, 12.604007777))
            Line((121.776008038, 12.604007777), (121.71506044, 12.604007777))
            Line((121.71506044, 12.604007777), (121.71506044, 12.364773606))
        make_face()
        with BuildLine():
            ThreePointArc((121.776008038, 13.416088038), (121.93340161, 14.289125908), (122.385764135, 15.052235339))
            ThreePointArc((122.385764135, 15.052235339), (122.549406884, 15.23924095), (122.715060489, 15.424467652))
            Line((122.715060489, 15.424467652), (121.776008038, 15.424467696))
            Line((121.776008038, 15.424467696), (121.776008038, 13.416088038))
        make_face()
        with BuildLine():
            ThreePointArc((122.385764135, -15.052235339), (121.93340161, -14.289125908), (121.776008038, -13.416088038))
            Line((121.776008038, -13.416088038), (121.776008038, -15.424467696))
            Line((121.776008038, -15.424467696), (122.715060489, -15.424467652))
            ThreePointArc((122.715060489, -15.424467652), (122.549406884, -15.23924095), (122.385764135, -15.052235339))
        make_face()
        with BuildLine():
            Line((121.71506044, -12.604007877), (121.776008038, -12.604007777))
            ThreePointArc((121.776008038, -12.604007777), (121.760531619, -12.48056994), (121.71506044, -12.364773606))
            Line((121.71506044, -12.364773606), (121.71506044, -12.604007877))
        make_face()
    extrude(amount=FILLET_14_3_DEPTH, mode=Mode.SUBTRACT)

    # 圆角15
    fillet_15_edges = [part.edges().sort_by_distance(p)[0] for p in [
        (-30.058809371, 129.276008038, 0),
        (-24.558809371, 121.71506044, 0),
    ]]
    fillet(fillet_15_edges, radius=FILLET_15_R)


solid = part.part
